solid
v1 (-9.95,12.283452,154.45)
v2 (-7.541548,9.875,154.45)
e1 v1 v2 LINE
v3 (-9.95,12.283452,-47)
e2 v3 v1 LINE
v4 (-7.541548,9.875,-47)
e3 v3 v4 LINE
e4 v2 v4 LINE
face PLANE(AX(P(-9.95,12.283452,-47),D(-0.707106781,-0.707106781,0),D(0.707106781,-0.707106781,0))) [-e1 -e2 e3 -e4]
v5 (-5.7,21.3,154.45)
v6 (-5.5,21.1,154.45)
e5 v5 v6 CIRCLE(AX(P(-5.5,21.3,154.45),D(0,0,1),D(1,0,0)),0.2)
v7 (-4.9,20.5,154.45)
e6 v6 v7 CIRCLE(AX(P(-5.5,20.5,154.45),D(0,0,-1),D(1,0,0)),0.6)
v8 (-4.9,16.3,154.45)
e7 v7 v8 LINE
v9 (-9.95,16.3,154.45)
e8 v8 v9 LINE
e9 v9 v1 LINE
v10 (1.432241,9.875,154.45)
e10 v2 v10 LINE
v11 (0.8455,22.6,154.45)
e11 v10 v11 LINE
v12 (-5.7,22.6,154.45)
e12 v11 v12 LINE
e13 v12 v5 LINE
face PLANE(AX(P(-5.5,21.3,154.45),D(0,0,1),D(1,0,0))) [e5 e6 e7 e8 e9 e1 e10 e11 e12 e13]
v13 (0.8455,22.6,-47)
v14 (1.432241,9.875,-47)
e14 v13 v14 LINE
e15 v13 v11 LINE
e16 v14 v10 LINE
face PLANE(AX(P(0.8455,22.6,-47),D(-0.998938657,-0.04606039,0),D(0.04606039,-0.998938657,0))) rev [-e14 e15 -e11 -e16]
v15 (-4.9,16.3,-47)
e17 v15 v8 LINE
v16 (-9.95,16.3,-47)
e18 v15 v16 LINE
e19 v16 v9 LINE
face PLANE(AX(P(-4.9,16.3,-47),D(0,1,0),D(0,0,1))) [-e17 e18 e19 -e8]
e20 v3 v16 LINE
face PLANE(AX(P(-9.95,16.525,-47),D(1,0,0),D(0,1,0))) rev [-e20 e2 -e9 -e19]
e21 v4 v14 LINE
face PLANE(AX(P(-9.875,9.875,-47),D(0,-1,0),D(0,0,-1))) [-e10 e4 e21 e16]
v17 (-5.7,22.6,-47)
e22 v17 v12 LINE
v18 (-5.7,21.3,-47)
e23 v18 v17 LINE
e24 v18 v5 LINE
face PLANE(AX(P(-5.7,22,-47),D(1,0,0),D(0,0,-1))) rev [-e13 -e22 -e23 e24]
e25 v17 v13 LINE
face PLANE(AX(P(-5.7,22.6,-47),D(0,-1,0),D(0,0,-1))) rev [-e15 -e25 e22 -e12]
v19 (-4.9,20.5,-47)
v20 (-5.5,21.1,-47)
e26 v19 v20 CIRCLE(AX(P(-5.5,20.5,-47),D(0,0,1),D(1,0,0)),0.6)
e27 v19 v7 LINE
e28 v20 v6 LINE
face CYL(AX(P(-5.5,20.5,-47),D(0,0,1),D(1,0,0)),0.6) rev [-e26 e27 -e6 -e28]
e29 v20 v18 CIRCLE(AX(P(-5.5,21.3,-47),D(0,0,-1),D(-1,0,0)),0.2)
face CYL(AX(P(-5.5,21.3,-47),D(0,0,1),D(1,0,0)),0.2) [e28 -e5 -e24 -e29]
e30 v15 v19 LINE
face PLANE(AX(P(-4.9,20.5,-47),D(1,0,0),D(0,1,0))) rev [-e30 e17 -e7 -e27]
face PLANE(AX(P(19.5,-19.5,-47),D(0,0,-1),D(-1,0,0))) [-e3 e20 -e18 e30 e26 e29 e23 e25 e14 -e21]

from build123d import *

# Parameters (mm, degrees)
Y_RAIL_SLOT_DEPTH      = 45
Y_RAIL_CONT_DEPTH      = 2
Z_RAIL_SLOT_DEPTH      = 45
X_RAIL_SLOT_DEPTH      = 45
TOLERANCE_START        = -45
TOLERANCE_CUT_Z_DEPTH  = 45
TOLERANCE_CUT_Y_DEPTH  = 135.627263211
TOLERANCE_CUT_X_DEPTH  = 45
SHARP_CORNER_FILLETS_R = 0.2
CUT_EXTRUDE1_DEPTH     = 135.627263211
CUT_EXTRUDE2_START     = -45
CUT_EXTRUDE2_DEPTH     = 45
SKETCH25_W             = 5.05
SKETCH25_H             = 4.200000003
SKETCH25_W_2           = 5.050000001
SKETCH25_H_2           = 4.200000002
SKETCH25_W_3           = 19.75
SKETCH25_H_3           = 19.75
CUT_EXTRUDE3_DEPTH     = 118.874933721
FILLET1_R              = 0.4
CUT_EXTRUDE4_DEPTH     = 118.874933721
BOSS_EXTRUDE1_START    = 109.45
BOSS_EXTRUDE1_DEPTH    = 109.45


with BuildPart() as part:
    # Sketch10 → Y-Rail Slot (new, symmetric)
    with BuildSketch(Plane.XY):
        with BuildLine():
            ThreePointArc((22, -5.8), (22.353553391, -5.946446609), (22.5, -6.3))
            Line((22.5, -6.3), (22.5, -19.5))
            ThreePointArc((22.5, -19.5), (21.621320343, -21.621320344), (19.499999999, -22.500000001))
            Line((19.499999999, -22.500000001), (24.499999999, -22.500000001))
            Line((24.499999999, -22.500000001), (24.499999999, 24.499999999))
            Line((24.499999999, 24.499999999), (-22.500000001, 24.499999999))
            Line((-22.500000001, 24.499999999), (-22.500000001, 19.500000001))
            ThreePointArc((-22.500000001, 19.500000001), (-21.621320345, 21.621320345), (-19.500000001, 22.500000001))
            Line((-19.500000001, 22.500000001), (-6.300000002, 22.500000001))
            ThreePointArc((-6.300000002, 22.500000001), (-5.946446612, 22.353553392), (-5.800000002, 22.000000001))
            Line((-5.800000002, 22.000000001), (-5.800000002, 21.000000004))
            Line((-5.800000002, 21.000000004), (-5.499999997, 21.000000004))
            ThreePointArc((-5.499999997, 21.000000004), (-5.146446607, 20.853553394), (-4.999999997, 20.500000004))
            Line((-4.999999997, 20.500000004), (-4.999999997, 17.525000004))
            ThreePointArc((-4.999999997, 17.525000004), (-5.146446607, 17.171446613), (-5.499999997, 17.025000004))
            Line((-5.499999997, 17.025000004), (-9.549999997, 17.025000004))
            ThreePointArc((-9.549999997, 17.025000004), (-9.903553388, 16.878553395), (-10.049999997, 16.525000004))
            Line((-10.049999997, 16.525000004), (-10.049999997, 11.757106781))
            ThreePointArc((-10.049999997, 11.757106781), (-10.011939764, 11.565765065), (-9.903553388, 11.403553391))
            Line((-9.903553388, 11.403553391), (-6.499999999, 8.000000002))
            Line((-6.499999998, 8.000000003), (2e-09, 8.000000003))
            Line((2e-09, 8.000000003), (6.500000002, 8.000000003))
            Line((6.500000002, 8.000000003), (9.903553392, 11.403553393))
            ThreePointArc((9.903553392, 11.403553393), (10.011939767, 11.565765067), (10.050000001, 11.757106783))
            Line((10.050000001, 11.757106783), (10.050000001, 16.525000003))
            ThreePointArc((10.050000001, 16.525000003), (9.903553392, 16.878553394), (9.550000001, 17.025000003))
            Line((9.550000001, 17.025000003), (5.5, 17.025000003))
            ThreePointArc((5.5, 17.025000003), (5.146446609, 17.171446613), (5, 17.525000003))
            Line((5, 17.525000003), (5, 20.500000003))
            ThreePointArc((5, 20.500000003), (5.146446609, 20.853553393), (5.5, 21.000000003))
            Line((5.5, 21.000000003), (5.800000001, 21.000000003))
            Line((5.800000001, 21.000000003), (5.800000001, 22.000000001))
            ThreePointArc((5.800000001, 22.000000001), (5.94644661, 22.353553392), (6.300000001, 22.500000001))
            Line((6.300000001, 22.500000001), (19.500000001, 22.500000001))
            ThreePointArc((19.500000001, 22.500000001), (21.621320345, 21.621320345), (22.500000001, 19.500000001))
            Line((22.500000001, 19.500000001), (22.500000001, 6.300000002))
            ThreePointArc((22.500000001, 6.300000002), (22.353553392, 5.946446612), (22.000000001, 5.800000002))
            Line((22.000000001, 5.800000002), (21.000000002, 5.800000002))
            Line((21.000000002, 5.800000002), (21.000000002, 5.500000005))
            ThreePointArc((21.000000002, 5.500000005), (20.853553393, 5.146446614), (20.500000002, 5.000000005))
            Line((20.500000002, 5.000000005), (17.525000003, 5.000000005))
            ThreePointArc((17.525000003, 5.000000005), (17.171446612, 5.146446614), (17.025000003, 5.500000005))
            Line((17.025000003, 5.500000005), (17.025000003, 10.050000003))
            Line((17.025000003, 10.050000003), (11.757106782, 10.050000003))
            ThreePointArc((11.757106782, 10.050000003), (11.565765066, 10.011939769), (11.403553391, 9.903553394))
            Line((11.403553391, 9.903553394), (8.000000002, 6.500000004))
            Line((8.000000001, 6.500000005), (8.000000001, 3e-09))
            Line((8.000000001, 3e-09), (8.000000001, -6.499999999))
            Line((8.000000001, -6.499999999), (11.40355339, -9.903553388))
            ThreePointArc((11.40355339, -9.903553388), (11.565765064, -10.011939763), (11.75710678, -10.049999997))
            Line((11.75710678, -10.049999997), (16.525, -10.049999997))
            ThreePointArc((16.525, -10.049999997), (16.878553391, -9.903553388), (17.025000001, -9.549999997))
            Line((17.025000001, -9.549999997), (17.025000001, -5.499999996))
            ThreePointArc((17.025000001, -5.499999996), (17.17144661, -5.146446605), (17.525000001, -4.999999996))
            Line((17.525000001, -4.999999996), (20.5, -4.999999996))
            ThreePointArc((20.5, -4.999999996), (20.853553391, -5.146446605), (21, -5.499999996))
            Line((21, -5.499999996), (21, -5.8))
            Line((21, -5.8), (22, -5.8))
        make_face()
    extrude(amount=Y_RAIL_SLOT_DEPTH, both=True)

    # Sketch12 → Y-Rail cont. (add)
    with BuildSketch(Plane(origin=(0, 0, -45), x_dir=(-1, 0, 0), z_dir=(0, 0, -1))):
        with BuildLine():
            Line((-22.5, -19.5), (-22.5, -6.3))
            ThreePointArc((-22.5, -6.3), (-22.353553391, -5.946446609), (-22, -5.8))
            Line((-22, -5.8), (-21, -5.8))
            Line((-21, -5.8), (-21, -5.499999996))
            ThreePointArc((-21, -5.499999996), (-20.853553391, -5.146446605), (-20.5, -4.999999996))
            Line((-20.5, -4.999999996), (-17.525000001, -4.999999996))
            ThreePointArc((-17.525000001, -4.999999996), (-17.17144661, -5.146446605), (-17.025000001, -5.499999996))
            Line((-17.025000001, -5.499999996), (-17.025000001, -9.549999997))
            ThreePointArc((-17.025000001, -9.549999997), (-16.878553391, -9.903553388), (-16.525, -10.049999997))
            Line((-16.525, -10.049999997), (-11.75710678, -10.049999997))
            ThreePointArc((-11.75710678, -10.049999997), (-11.565765064, -10.011939763), (-11.40355339, -9.903553388))
            Line((-11.40355339, -9.903553388), (-8.000000001, -6.499999999))
            Line((-8.000000001, -6.499999999), (-8.000000001, 6.500000003))
            Line((-8.000000001, 6.500000003), (-11.403553391, 9.903553394))
            ThreePointArc((-11.403553391, 9.903553394), (-11.565765066, 10.011939769), (-11.757106782, 10.050000003))
            Line((-11.757106782, 10.050000003), (-17.025000003, 10.050000003))
            Line((-17.025000003, 10.050000003), (-17.025000003, 5.500000005))
            ThreePointArc((-17.025000003, 5.500000005), (-17.171446612, 5.146446614), (-17.525000003, 5.000000005))
            Line((-17.525000003, 5.000000005), (-20.500000002, 5.000000005))
            ThreePointArc((-20.500000002, 5.000000005), (-20.853553393, 5.146446614), (-21.000000002, 5.500000005))
            Line((-21.000000002, 5.500000005), (-21.000000002, 5.800000002))
            Line((-21.000000002, 5.800000002), (-22.000000001, 5.800000002))
            ThreePointArc((-22.000000001, 5.800000002), (-22.353553392, 5.946446612), (-22.500000001, 6.300000002))
            Line((-22.500000001, 6.300000002), (-22.500000001, 19.500000001))
            ThreePointArc((-22.500000001, 19.500000001), (-21.621320345, 21.621320345), (-19.500000001, 22.500000001))
            Line((-19.500000001, 22.500000001), (-6.300000001, 22.500000001))
            ThreePointArc((-6.300000001, 22.500000001), (-5.94644661, 22.353553392), (-5.800000001, 22.000000001))
            Line((-5.800000001, 22.000000001), (-5.800000001, 21.000000003))
            Line((-5.800000001, 21.000000003), (-5.5, 21.000000003))
            ThreePointArc((-5.5, 21.000000003), (-5.146446609, 20.853553393), (-5, 20.500000003))
            Line((-5, 20.500000003), (-5, 17.525000003))
            ThreePointArc((-5, 17.525000003), (-5.146446609, 17.171446613), (-5.5, 17.025000003))
            Line((-5.5, 17.025000003), (-9.550000001, 17.025000003))
            ThreePointArc((-9.550000001, 17.025000003), (-9.903553392, 16.878553394), (-10.050000001, 16.525000003))
            Line((-10.050000001, 16.525000003), (-10.050000001, 11.757106783))
            ThreePointArc((-10.050000001, 11.757106783), (-10.011939767, 11.565765067), (-9.903553392, 11.403553393))
            Line((-9.903553392, 11.403553393), (-6.500000002, 8.000000003))
            Line((-6.500000002, 8.000000003), (6.5, 8.000000003))
            Line((6.5, 8.000000003), (9.903553388, 11.403553391))
            ThreePointArc((9.903553388, 11.403553391), (10.011939764, 11.565765065), (10.049999997, 11.757106781))
            Line((10.049999997, 11.757106781), (10.049999997, 16.525000004))
            ThreePointArc((10.049999997, 16.525000004), (9.903553388, 16.878553395), (9.549999997, 17.025000004))
            Line((9.549999997, 17.025000004), (5.499999997, 17.025000004))
            ThreePointArc((5.499999997, 17.025000004), (5.146446607, 17.171446613), (4.999999997, 17.525000004))
            Line((4.999999997, 17.525000004), (4.999999997, 20.500000004))
            ThreePointArc((4.999999997, 20.500000004), (5.146446607, 20.853553394), (5.499999997, 21.000000004))
            Line((5.499999997, 21.000000004), (5.800000002, 21.000000004))
            Line((5.800000002, 21.000000004), (5.800000002, 22.000000001))
            ThreePointArc((5.800000002, 22.000000001), (5.946446612, 22.353553392), (6.300000002, 22.500000001))
            Line((6.300000002, 22.500000001), (19.500000001, 22.500000001))
            ThreePointArc((19.500000001, 22.500000001), (21.621320345, 21.621320345), (22.500000001, 19.500000001))
            Line((22.500000001, 19.500000001), (22.500000001, 24.499999999))
            Line((22.500000001, 24.499999999), (-24.499999999, 24.499999999))
            Line((-24.499999999, 24.499999999), (-24.499999999, -22.500000001))
            Line((-24.499999999, -22.500000001), (-19.499999999, -22.500000001))
            ThreePointArc((-19.499999999, -22.500000001), (-21.621320343, -21.621320344), (-22.5, -19.5))
        make_face()
    extrude(amount=Y_RAIL_CONT_DEPTH)

    # Sketch17 → Z-Rail Slot (add)
    with BuildSketch(Plane(origin=(0, 24.499999999, 0), x_dir=(1, 0, 0), z_dir=(0, 1, 0))):
        with BuildLine():
            Line((19.499999999, -45), (24.499999999, -45))
            Line((24.499999999, -45), (24.499999999, 2))
            Line((24.499999999, 2), (-22.500000001, 2))
            Line((-22.500000001, 2), (-22.500000001, -2.999999998))
            ThreePointArc((-22.500000001, -2.999999998), (-21.621320345, -0.878679654), (-19.500000001, 2e-09))
            Line((-19.500000001, 2e-09), (-6.300000002, 2e-09))
            ThreePointArc((-6.300000002, 2e-09), (-5.946446612, -0.146446607), (-5.800000002, -0.499999998))
            Line((-5.800000002, -0.499999998), (-5.800000002, -1.499999995))
            Line((-5.800000002, -1.499999995), (-5.499999997, -1.499999995))
            ThreePointArc((-5.499999997, -1.499999995), (-5.146446607, -1.646446605), (-4.999999997, -1.999999995))
            Line((-4.999999997, -1.999999995), (-4.999999997, -4.974999995))
            ThreePointArc((-4.999999997, -4.974999995), (-5.146446607, -5.328553385), (-5.499999997, -5.474999995))
            Line((-5.499999997, -5.474999995), (-9.549999997, -5.474999995))
            ThreePointArc((-9.549999997, -5.474999995), (-9.903553388, -5.621446604), (-10.049999997, -5.974999995))
            Line((-10.049999997, -5.974999995), (-10.049999997, -10.742893218))
            ThreePointArc((-10.049999997, -10.742893218), (-10.011939764, -10.934234934), (-9.903553388, -11.096446608))
            Line((-9.903553388, -11.096446608), (-6.5, -14.499999996))
            Line((-6.5, -14.499999996), (6.500000002, -14.499999996))
            Line((6.500000002, -14.499999996), (9.903553392, -11.096446606))
            ThreePointArc((9.903553392, -11.096446606), (10.011939767, -10.934234932), (10.050000001, -10.742893216))
            Line((10.050000001, -10.742893216), (10.050000001, -5.974999996))
            ThreePointArc((10.050000001, -5.974999996), (9.903553392, -5.621446605), (9.550000001, -5.474999996))
            Line((9.550000001, -5.474999996), (5.5, -5.474999996))
            ThreePointArc((5.5, -5.474999996), (5.146446609, -5.328553386), (5, -4.974999996))
            Line((5, -4.974999996), (5, -1.999999996))
            ThreePointArc((5, -1.999999996), (5.146446609, -1.646446606), (5.5, -1.499999996))
            Line((5.5, -1.499999996), (5.800000001, -1.499999996))
            Line((5.800000001, -1.499999996), (5.800000001, -0.499999998))
            ThreePointArc((5.800000001, -0.499999998), (5.94644661, -0.146446607), (6.300000001, 2e-09))
            Line((6.300000001, 2e-09), (19.500000001, 2e-09))
            ThreePointArc((19.500000001, 2e-09), (21.621320345, -0.878679654), (22.500000001, -2.999999998))
            Line((22.500000001, -2.999999998), (22.500000001, -16.199999997))
            ThreePointArc((22.500000001, -16.199999997), (22.353553392, -16.553553387), (22.000000001, -16.699999997))
            Line((22.000000001, -16.699999997), (21.000000002, -16.699999997))
            Line((21.000000002, -16.699999997), (21.000000002, -16.999999994))
            ThreePointArc((21.000000002, -16.999999994), (20.853553393, -17.353553385), (20.500000002, -17.499999994))
            Line((20.500000002, -17.499999994), (17.525000003, -17.499999994))
            ThreePointArc((17.525000003, -17.499999994), (17.171446612, -17.353553385), (17.025000003, -16.999999994))
            Line((17.025000003, -16.999999994), (17.025000003, -12.449999996))
            Line((17.025000003, -12.449999996), (11.757106782, -12.449999996))
            ThreePointArc((11.757106782, -12.449999996), (11.565765066, -12.48806023), (11.403553391, -12.596446605))
            Line((11.403553391, -12.596446605), (8.000000001, -15.999999995))
            Line((8.000000001, -15.999999995), (8.000000001, -28.999999998))
            Line((8.000000001, -28.999999998), (11.40355339, -32.403553387))
            ThreePointArc((11.40355339, -32.403553387), (11.565765064, -32.511939762), (11.75710678, -32.549999996))
            Line((11.75710678, -32.549999996), (16.525, -32.549999996))
            ThreePointArc((16.525, -32.549999996), (16.878553391, -32.403553386), (17.025000001, -32.049999996))
            Line((17.025000001, -32.049999996), (17.025000001, -27.999999995))
            ThreePointArc((17.025000001, -27.999999995), (17.17144661, -27.646446604), (17.525000001, -27.499999995))
            Line((17.525000001, -27.499999995), (20.5, -27.499999995))
            ThreePointArc((20.5, -27.499999995), (20.853553391, -27.646446604), (21, -27.999999995))
            Line((21, -27.999999995), (21, -28.299999999))
            Line((21, -28.299999999), (22, -28.299999999))
            ThreePointArc((22, -28.299999999), (22.353553391, -28.446446608), (22.5, -28.799999999))
            Line((22.5, -28.799999999), (22.5, -41.999999999))
            ThreePointArc((22.5, -41.999999999), (21.621320343, -44.121320343), (19.499999999, -45))
        make_face()
    extrude(amount=Z_RAIL_SLOT_DEPTH)

    # Sketch11 → X-Rail Slot (add)
    with BuildSketch(Plane(origin=(24.499999999, 0, 0), x_dir=(0, 0, -1), z_dir=(1, 0, 0))):
        with BuildLine():
            ThreePointArc((16.2, 22.5), (16.553553391, 22.353553391), (16.7, 22))
            Line((16.7, 22), (16.7, 21))
            Line((16.7, 21), (17, 21))
            ThreePointArc((17, 21), (17.353553391, 20.853553391), (17.5, 20.5))
            Line((17.5, 20.5), (17.5, 17.525))
            ThreePointArc((17.5, 17.525), (17.353553391, 17.171446609), (17, 17.025))
            Line((17, 17.025), (12.95, 17.025))
            ThreePointArc((12.95, 17.025), (12.596446609, 16.878553391), (12.45, 16.525))
            Line((12.45, 16.525), (12.45, 11.757106781))
            ThreePointArc((12.45, 11.757106781), (12.488060234, 11.565765065), (12.596446609, 11.403553391))
            Line((12.596446609, 11.403553391), (16, 8))
            Line((16, 8), (22.5, 8))
            Line((22.5, 8), (29, 8))
            Line((29, 8), (32.403553391, 11.403553391))
            ThreePointArc((32.403553391, 11.403553391), (32.511939766, 11.565765065), (32.55, 11.757106781))
            Line((32.55, 11.757106781), (32.55, 17.025))
            Line((32.55, 17.025), (28, 17.025))
            ThreePointArc((28, 17.025), (27.646446609, 17.171446609), (27.5, 17.525))
            Line((27.5, 17.525), (27.5, 20.5))
            ThreePointArc((27.5, 20.5), (27.646446609, 20.853553391), (28, 21))
            Line((28, 21), (28.3, 21))
            Line((28.3, 21), (28.3, 22))
            ThreePointArc((28.3, 22), (28.446446609, 22.353553391), (28.8, 22.5))
            Line((28.8, 22.5), (42, 22.5))
            ThreePointArc((42, 22.5), (44.121320344, 21.621320344), (45, 19.5))
            Line((45, 19.5), (45, 6.3))
            ThreePointArc((45, 6.3), (44.853553391, 5.946446609), (44.5, 5.8))
            Line((44.5, 5.8), (43.5, 5.8))
            Line((43.5, 5.8), (43.5, 5.5))
            ThreePointArc((43.5, 5.5), (43.353553391, 5.146446609), (43, 5))
            Line((43, 5), (40.025, 5))
            ThreePointArc((40.025, 5), (39.671446609, 5.146446609), (39.525, 5.5))
            Line((39.525, 5.5), (39.525, 9.55))
            ThreePointArc((39.525, 9.55), (39.378553391, 9.903553391), (39.025, 10.05))
            Line((39.025, 10.05), (34.257106781, 10.05))
            ThreePointArc((34.257106781, 10.05), (34.065765065, 10.011939766), (33.903553391, 9.903553391))
            Line((33.903553391, 9.903553391), (30.5, 6.5))
            Line((30.5, 6.5), (30.5, 0))
            Line((30.5, 0), (30.5, -6.5))
            Line((30.5, -6.5), (33.903553391, -9.903553391))
            ThreePointArc((33.903553391, -9.903553391), (34.065765065, -10.011939766), (34.257106781, -10.05))
            Line((34.257106781, -10.05), (39.025, -10.05))
            ThreePointArc((39.025, -10.05), (39.378553391, -9.903553391), (39.525, -9.55))
            Line((39.525, -9.55), (39.525, -5.5))
            ThreePointArc((39.525, -5.5), (39.671446609, -5.146446609), (40.025, -5))
            Line((40.025, -5), (43, -5))
            ThreePointArc((43, -5), (43.353553391, -5.146446609), (43.5, -5.5))
            Line((43.5, -5.5), (43.5, -5.8))
            Line((43.5, -5.8), (44.5, -5.8))
            ThreePointArc((44.5, -5.8), (44.853553391, -5.946446609), (45, -6.3))
            Line((45, -6.3), (45, -19.5))
            ThreePointArc((45, -19.5), (44.121320344, -21.621320344), (42, -22.5))
            Line((42, -22.5), (47, -22.500000001))
            Line((47, -22.500000001), (47, 24.499999999))
            Line((47, 24.499999999), (-45, 24.499999999))
            Line((-45, 24.499999999), (-45, 19.5))
            ThreePointArc((-45, 19.5), (-44.121320344, 21.621320344), (-42, 22.5))
            Line((-42, 22.5), (-28.8, 22.5))
            ThreePointArc((-28.8, 22.5), (-28.446446609, 22.353553391), (-28.3, 22))
            Line((-28.3, 22), (-28.3, 21))
            Line((-28.3, 21), (-28, 21))
            ThreePointArc((-28, 21), (-27.646446609, 20.853553391), (-27.5, 20.5))
            Line((-27.5, 20.5), (-27.5, 17.525))
            ThreePointArc((-27.5, 17.525), (-27.646446609, 17.171446609), (-28, 17.025))
            Line((-28, 17.025), (-32.55, 17.025))
            Line((-32.55, 17.025), (-32.55, 11.757106781))
            ThreePointArc((-32.55, 11.757106781), (-32.511939766, 11.565765065), (-32.403553391, 11.403553391))
            Line((-32.403553391, 11.403553391), (-29, 8))
            Line((-29, 8), (-22.5, 8))
            Line((-22.5, 8), (-16, 8))
            Line((-16, 8), (-12.596446609, 11.403553391))
            ThreePointArc((-12.596446609, 11.403553391), (-12.488060234, 11.565765065), (-12.45, 11.757106781))
            Line((-12.45, 11.757106781), (-12.45, 16.525))
            ThreePointArc((-12.45, 16.525), (-12.596446609, 16.878553391), (-12.95, 17.025))
            Line((-12.95, 17.025), (-17, 17.025))
            ThreePointArc((-17, 17.025), (-17.353553391, 17.171446609), (-17.5, 17.525))
            Line((-17.5, 17.525), (-17.5, 20.5))
            ThreePointArc((-17.5, 20.5), (-17.353553391, 20.853553391), (-17, 21))
            Line((-17, 21), (-16.7, 21))
            Line((-16.7, 21), (-16.7, 22))
            ThreePointArc((-16.7, 22), (-16.553553391, 22.353553391), (-16.2, 22.5))
            Line((-16.2, 22.5), (-7.8, 22.5))
            Line((-7.8, 22.5), (-7.8, 21.5))
            ThreePointArc((-7.8, 21.5), (-7.653553391, 21.146446609), (-7.3, 21))
            Line((-7.3, 21), (7.3, 21))
            ThreePointArc((7.3, 21), (7.653553391, 21.146446609), (7.8, 21.5))
            Line((7.8, 21.5), (7.8, 22.5))
            Line((7.8, 22.5), (16.2, 22.5))
        make_face()
    extrude(amount=X_RAIL_SLOT_DEPTH)

    # Sketch20 → Tolerance Cut Z (cut)
    with BuildSketch(Plane(origin=(0, 69.499999999, 0), x_dir=(1, 0, 0), z_dir=(0, 1, 0)).offset(TOLERANCE_START)):
        with BuildLine():
            ThreePointArc((-22.500000001, -2.999999998), (-21.621320345, -0.878679654), (-19.500000001, 2e-09))
            Line((-19.500000001, 2e-09), (-6.300000002, 2e-09))
            ThreePointArc((-6.300000002, 2e-09), (-5.946446612, -0.146446607), (-5.800000002, -0.499999998))
            Line((-5.800000002, -0.499999998), (-5.800000002, -1.499999995))
            Line((-5.800000002, -1.499999995), (-5.499999997, -1.499999995))
            ThreePointArc((-5.499999997, -1.499999995), (-5.146446607, -1.646446605), (-4.999999997, -1.999999995))
            Line((-4.999999997, -1.999999995), (-4.999999997, -4.974999995))
            ThreePointArc((-4.999999997, -4.974999995), (-5.146446607, -5.328553385), (-5.499999997, -5.474999995))
            Line((-5.499999997, -5.474999995), (-9.549999997, -5.474999995))
            ThreePointArc((-9.549999997, -5.474999995), (-9.903553388, -5.621446604), (-10.049999997, -5.974999995))
            Line((-10.049999997, -5.974999995), (-10.049999997, -10.742893218))
            ThreePointArc((-10.049999997, -10.742893218), (-10.011939764, -10.934234934), (-9.903553388, -11.096446608))
            Line((-9.903553388, -11.096446608), (-6.5, -14.499999996))
            Line((-6.5, -14.499999996), (6.500000002, -14.499999996))
            Line((6.500000002, -14.499999996), (9.903553392, -11.096446606))
            ThreePointArc((9.903553392, -11.096446606), (10.011939767, -10.934234932), (10.050000001, -10.742893216))
            Line((10.050000001, -10.742893216), (10.050000001, -5.974999996))
            ThreePointArc((10.050000001, -5.974999996), (9.903553392, -5.621446605), (9.550000001, -5.474999996))
            Line((9.550000001, -5.474999996), (5.5, -5.474999996))
            ThreePointArc((5.5, -5.474999996), (5.146446609, -5.328553386), (5, -4.974999996))
            Line((5, -4.974999996), (5, -1.999999996))
            ThreePointArc((5, -1.999999996), (5.146446609, -1.646446606), (5.5, -1.499999996))
            Line((5.5, -1.499999996), (5.800000001, -1.499999996))
            Line((5.800000001, -1.499999996), (5.800000001, -0.499999998))
            ThreePointArc((5.800000001, -0.499999998), (5.94644661, -0.146446607), (6.300000001, 2e-09))
            Line((6.300000001, 2e-09), (19.500000001, 2e-09))
            ThreePointArc((19.500000001, 2e-09), (21.621320345, -0.878679654), (22.500000001, -2.999999998))
            Line((22.500000001, -2.999999998), (22.500000001, -16.199999997))
            ThreePointArc((22.500000001, -16.199999997), (22.353553392, -16.553553387), (22.000000001, -16.699999997))
            Line((22.000000001, -16.699999997), (21.000000002, -16.699999997))
            Line((21.000000002, -16.699999997), (21.000000002, -16.999999994))
            ThreePointArc((21.000000002, -16.999999994), (20.853553393, -17.353553385), (20.500000002, -17.499999994))
            Line((20.500000002, -17.499999994), (17.525000003, -17.499999994))
            ThreePointArc((17.525000003, -17.499999994), (17.171446612, -17.353553385), (17.025000003, -16.999999994))
            Line((17.025000003, -16.999999994), (17.025000003, -12.449999996))
            Line((17.025000003, -12.449999996), (11.757106782, -12.449999996))
            ThreePointArc((11.757106782, -12.449999996), (11.565765066, -12.48806023), (11.403553391, -12.596446605))
            Line((11.403553391, -12.596446605), (8.000000001, -15.999999995))
            Line((8.000000001, -15.999999995), (8.000000001, -28.999999998))
            Line((8.000000001, -28.999999998), (11.40355339, -32.403553387))
            ThreePointArc((11.40355339, -32.403553387), (11.565765064, -32.511939762), (11.75710678, -32.549999996))
            Line((11.75710678, -32.549999996), (16.525, -32.549999996))
            ThreePointArc((16.525, -32.549999996), (16.878553391, -32.403553386), (17.025000001, -32.049999996))
            Line((17.025000001, -32.049999996), (17.025000001, -27.999999995))
            ThreePointArc((17.025000001, -27.999999995), (17.17144661, -27.646446604), (17.525000001, -27.499999995))
            Line((17.525000001, -27.499999995), (20.5, -27.499999995))
            ThreePointArc((20.5, -27.499999995), (20.853553391, -27.646446604), (21, -27.999999995))
            Line((21, -27.999999995), (21, -28.299999999))
            Line((21, -28.299999999), (22, -28.299999999))
            ThreePointArc((22, -28.299999999), (22.353553391, -28.446446608), (22.5, -28.799999999))
            Line((22.5, -28.799999999), (22.5, -41.999999999))
            ThreePointArc((22.5, -41.999999999), (21.621320343, -44.121320343), (19.499999999, -45))
            Line((19.499999999, -45), (19.499999999, -45.1))
            ThreePointArc((19.499999999, -45.1), (21.692031022, -44.192031021), (22.6, -41.999999999))
            Line((22.6, -41.999999999), (22.6, -28.799999999))
            ThreePointArc((22.6, -28.799999999), (22.424264069, -28.37573593), (22, -28.199999999))
            Line((22, -28.199999999), (21.1, -28.199999999))
            Line((21.1, -28.199999999), (21.1, -27.999999995))
            ThreePointArc((21.1, -27.999999995), (20.924264069, -27.575735926), (20.5, -27.399999995))
            Line((20.5, -27.399999995), (17.525000001, -27.399999995))
            ThreePointArc((17.525000001, -27.399999995), (17.100735932, -27.575735926), (16.925000001, -27.999999995))
            Line((16.925000001, -27.999999995), (16.925000001, -32.049999996))
            ThreePointArc((16.925000001, -32.049999996), (16.807842713, -32.332842708), (16.525, -32.449999996))
            Line((16.525, -32.449999996), (11.75710678, -32.449999996))
            ThreePointArc((11.75710678, -32.449999996), (11.604033408, -32.419551809), (11.474264068, -32.332842709))
            Line((11.474264068, -32.332842709), (8.100000001, -28.958578641))
            Line((8.100000001, -28.958578641), (8.100000001, -16.041421352))
            Line((8.100000001, -16.041421352), (11.474264069, -12.667157283))
            ThreePointArc((11.474264069, -12.667157283), (11.604033409, -12.580448183), (11.757106782, -12.549999996))
            Line((11.757106782, -12.549999996), (16.925000003, -12.549999996))
            Line((16.925000003, -12.549999996), (16.925000003, -16.999999994))
            ThreePointArc((16.925000003, -16.999999994), (17.100735934, -17.424264063), (17.525000003, -17.599999994))
            Line((17.525000003, -17.599999994), (20.500000002, -17.599999994))
            ThreePointArc((20.500000002, -17.599999994), (20.924264071, -17.424264063), (21.100000002, -16.999999994))
            Line((21.100000002, -16.999999994), (21.100000002, -16.799999997))
            Line((21.100000002, -16.799999997), (22.000000001, -16.799999997))
            ThreePointArc((22.000000001, -16.799999997), (22.42426407, -16.624264066), (22.600000001, -16.199999997))
            Line((22.600000001, -16.199999997), (22.600000001, -2.999999998))
            ThreePointArc((22.600000001, -2.999999998), (21.692031023, -0.807968976), (19.500000001, 0.100000002))
            Line((19.500000001, 0.100000002), (6.300000001, 0.100000002))
            ThreePointArc((6.300000001, 0.100000002), (5.875735932, -0.075735929), (5.700000001, -0.499999998))
            Line((5.700000001, -0.499999998), (5.700000001, -1.399999996))
            Line((5.700000001, -1.399999996), (5.5, -1.399999996))
            ThreePointArc((5.5, -1.399999996), (5.075735931, -1.575735927), (4.9, -1.999999996))
            Line((4.9, -1.999999996), (4.9, -4.974999996))
            ThreePointArc((4.9, -4.974999996), (5.075735931, -5.399264064), (5.5, -5.574999996))
            Line((5.5, -5.574999996), (9.550000001, -5.574999996))
            ThreePointArc((9.550000001, -5.574999996), (9.832842713, -5.692157283), (9.950000001, -5.974999996))
            Line((9.950000001, -5.974999996), (9.950000001, -10.742893216))
            ThreePointArc((9.950000001, -10.742893216), (9.919551814, -10.895966589), (9.832842714, -11.025735928))
            Line((9.832842714, -11.025735928), (6.458578646, -14.399999996))
            Line((6.458578646, -14.399999996), (-6.458578644, -14.399999996))
            Line((-6.458578644, -14.399999996), (-9.83284271, -11.02573593))
            ThreePointArc((-9.83284271, -11.02573593), (-9.91955181, -10.89596659), (-9.949999997, -10.742893218))
            Line((-9.949999997, -10.742893218), (-9.949999997, -5.974999995))
            ThreePointArc((-9.949999997, -5.974999995), (-9.83284271, -5.692157282), (-9.549999997, -5.574999995))
            Line((-9.549999997, -5.574999995), (-5.499999997, -5.574999995))
            ThreePointArc((-5.499999997, -5.574999995), (-5.075735928, -5.399264064), (-4.899999997, -4.974999995))
            Line((-4.899999997, -4.974999995), (-4.899999997, -1.999999995))
            ThreePointArc((-4.899999997, -1.999999995), (-5.075735928, -1.575735927), (-5.499999997, -1.399999995))
            Line((-5.499999997, -1.399999995), (-5.700000002, -1.399999995))
            Line((-5.700000002, -1.399999995), (-5.700000002, -0.499999998))
            ThreePointArc((-5.700000002, -0.499999998), (-5.875735933, -0.075735929), (-6.300000002, 0.100000002))
            Line((-6.300000002, 0.100000002), (-19.500000001, 0.100000002))
            ThreePointArc((-19.500000001, 0.100000002), (-21.692031023, -0.807968976), (-22.600000001, -2.999999998))
            Line((-22.600000001, -2.999999998), (-22.500000001, -2.999999998))
        make_face()
    extrude(amount=TOLERANCE_CUT_Z_DEPTH, mode=Mode.SUBTRACT)

    # Sketch21 → Tolerance Cut Y (cut, through all)
    with BuildSketch(Plane.XY.offset(45)):
        with BuildLine():
            ThreePointArc((-22.500000001, 19.500000001), (-21.621320345, 21.621320345), (-19.500000001, 22.500000001))
            Line((-19.500000001, 22.500000001), (-6.300000002, 22.500000001))
            ThreePointArc((-6.300000002, 22.500000001), (-5.946446612, 22.353553392), (-5.800000002, 22.000000001))
            Line((-5.800000002, 22.000000001), (-5.800000002, 21.000000004))
            Line((-5.800000002, 21.000000004), (-5.499999997, 21.000000004))
            ThreePointArc((-5.499999997, 21.000000004), (-5.146446607, 20.853553394), (-4.999999997, 20.500000004))
            Line((-4.999999997, 20.500000004), (-4.999999997, 17.525000004))
            ThreePointArc((-4.999999997, 17.525000004), (-5.146446607, 17.171446613), (-5.499999997, 17.025000004))
            Line((-5.499999997, 17.025000004), (-9.549999997, 17.025000004))
            ThreePointArc((-9.549999997, 17.025000004), (-9.903553388, 16.878553395), (-10.049999997, 16.525000004))
            Line((-10.049999997, 16.525000004), (-10.049999997, 11.757106781))
            ThreePointArc((-10.049999997, 11.757106781), (-10.011939764, 11.565765065), (-9.903553388, 11.403553391))
            Line((-9.903553388, 11.403553391), (-6.5, 8.000000003))
            Line((-6.5, 8.000000003), (6.500000002, 8.000000003))
            Line((6.500000002, 8.000000003), (9.903553392, 11.403553393))
            ThreePointArc((9.903553392, 11.403553393), (10.011939767, 11.565765067), (10.050000001, 11.757106783))
            Line((10.050000001, 11.757106783), (10.050000001, 16.525000003))
            ThreePointArc((10.050000001, 16.525000003), (9.903553392, 16.878553394), (9.550000001, 17.025000003))
            Line((9.550000001, 17.025000003), (5.5, 17.025000003))
            ThreePointArc((5.5, 17.025000003), (5.146446609, 17.171446613), (5, 17.525000003))
            Line((5, 17.525000003), (5, 20.500000003))
            ThreePointArc((5, 20.500000003), (5.146446609, 20.853553393), (5.5, 21.000000003))
            Line((5.5, 21.000000003), (5.800000001, 21.000000003))
            Line((5.800000001, 21.000000003), (5.800000001, 22.000000001))
            ThreePointArc((5.800000001, 22.000000001), (5.94644661, 22.353553392), (6.300000001, 22.500000001))
            Line((6.300000001, 22.500000001), (19.500000001, 22.500000001))
            ThreePointArc((19.500000001, 22.500000001), (21.621320345, 21.621320345), (22.500000001, 19.500000001))
            Line((22.500000001, 19.500000001), (22.500000001, 6.300000002))
            ThreePointArc((22.500000001, 6.300000002), (22.353553392, 5.946446612), (22.000000001, 5.800000002))
            Line((22.000000001, 5.800000002), (21.000000002, 5.800000002))
            Line((21.000000002, 5.800000002), (21.000000002, 5.500000005))
            ThreePointArc((21.000000002, 5.500000005), (20.853553393, 5.146446614), (20.500000002, 5.000000005))
            Line((20.500000002, 5.000000005), (17.525000003, 5.000000005))
            ThreePointArc((17.525000003, 5.000000005), (17.171446612, 5.146446614), (17.025000003, 5.500000005))
            Line((17.025000003, 5.500000005), (17.025000003, 10.050000003))
            Line((17.025000003, 10.050000003), (11.757106782, 10.050000003))
            ThreePointArc((11.757106782, 10.050000003), (11.565765066, 10.011939769), (11.403553391, 9.903553394))
            Line((11.403553391, 9.903553394), (8.000000001, 6.500000003))
            Line((8.000000001, 6.500000003), (8.000000001, -6.499999999))
            Line((8.000000001, -6.499999999), (11.40355339, -9.903553388))
            ThreePointArc((11.40355339, -9.903553388), (11.565765064, -10.011939763), (11.75710678, -10.049999997))
            Line((11.75710678, -10.049999997), (16.525, -10.049999997))
            ThreePointArc((16.525, -10.049999997), (16.878553391, -9.903553388), (17.025000001, -9.549999997))
            Line((17.025000001, -9.549999997), (17.025000001, -5.499999996))
            ThreePointArc((17.025000001, -5.499999996), (17.17144661, -5.146446605), (17.525000001, -4.999999996))
            Line((17.525000001, -4.999999996), (20.5, -4.999999996))
            ThreePointArc((20.5, -4.999999996), (20.853553391, -5.146446605), (21, -5.499999996))
            Line((21, -5.499999996), (21, -5.8))
            Line((21, -5.8), (22, -5.8))
            ThreePointArc((22, -5.8), (22.353553391, -5.946446609), (22.5, -6.3))
            Line((22.5, -6.3), (22.5, -19.5))
            ThreePointArc((22.5, -19.5), (21.621320343, -21.621320344), (19.499999999, -22.500000001))
            Line((19.499999999, -22.500000001), (19.499999999, -22.600000001))
            ThreePointArc((19.499999999, -22.600000001), (21.692031022, -21.692031022), (22.6, -19.5))
            Line((22.6, -19.5), (22.6, -6.3))
            ThreePointArc((22.6, -6.3), (22.424264069, -5.875735931), (22, -5.7))
            Line((22, -5.7), (21.1, -5.7))
            Line((21.1, -5.7), (21.1, -5.499999996))
            ThreePointArc((21.1, -5.499999996), (20.924264069, -5.075735927), (20.5, -4.899999996))
            Line((20.5, -4.899999996), (17.525000001, -4.899999996))
            ThreePointArc((17.525000001, -4.899999996), (17.100735932, -5.075735927), (16.925000001, -5.499999996))
            Line((16.925000001, -5.499999996), (16.925000001, -9.549999997))
            ThreePointArc((16.925000001, -9.549999997), (16.807842713, -9.832842709), (16.525, -9.949999997))
            Line((16.525, -9.949999997), (11.75710678, -9.949999997))
            ThreePointArc((11.75710678, -9.949999997), (11.604033408, -9.91955181), (11.474264068, -9.83284271))
            Line((11.474264068, -9.83284271), (8.100000001, -6.458578642))
            Line((8.100000001, -6.458578642), (8.100000001, 6.458578647))
            Line((8.100000001, 6.458578647), (11.474264069, 9.832842716))
            ThreePointArc((11.474264069, 9.832842716), (11.604033409, 9.919551816), (11.757106782, 9.950000003))
            Line((11.757106782, 9.950000003), (16.925000003, 9.950000003))
            Line((16.925000003, 9.950000003), (16.925000003, 5.500000005))
            ThreePointArc((16.925000003, 5.500000005), (17.100735934, 5.075735936), (17.525000003, 4.900000005))
            Line((17.525000003, 4.900000005), (20.500000002, 4.900000005))
            ThreePointArc((20.500000002, 4.900000005), (20.924264071, 5.075735936), (21.100000002, 5.500000005))
            Line((21.100000002, 5.500000005), (21.100000002, 5.700000002))
            Line((21.100000002, 5.700000002), (22.000000001, 5.700000002))
            ThreePointArc((22.000000001, 5.700000002), (22.42426407, 5.875735933), (22.600000001, 6.300000002))
            Line((22.600000001, 6.300000002), (22.600000001, 19.500000001))
            ThreePointArc((22.600000001, 19.500000001), (21.692031023, 21.692031023), (19.500000001, 22.600000001))
            Line((19.500000001, 22.600000001), (6.300000001, 22.600000001))
            ThreePointArc((6.300000001, 22.600000001), (5.875735932, 22.42426407), (5.700000001, 22.000000001))
            Line((5.700000001, 22.000000001), (5.700000001, 21.100000003))
            Line((5.700000001, 21.100000003), (5.5, 21.100000003))
            ThreePointArc((5.5, 21.100000003), (5.075735931, 20.924264072), (4.9, 20.500000003))
            Line((4.9, 20.500000003), (4.9, 17.525000003))
            ThreePointArc((4.9, 17.525000003), (5.075735931, 17.100735935), (5.5, 16.925000003))
            Line((5.5, 16.925000003), (9.550000001, 16.925000003))
            ThreePointArc((9.550000001, 16.925000003), (9.832842713, 16.807842716), (9.950000001, 16.525000003))
            Line((9.950000001, 16.525000003), (9.950000001, 11.757106783))
            ThreePointArc((9.950000001, 11.757106783), (9.919551814, 11.60403341), (9.832842714, 11.474264071))
            Line((9.832842714, 11.474264071), (6.458578646, 8.100000003))
            Line((6.458578646, 8.100000003), (-6.458578644, 8.100000003))
            Line((-6.458578644, 8.100000003), (-9.83284271, 11.474264069))
            ThreePointArc((-9.83284271, 11.474264069), (-9.91955181, 11.604033408), (-9.949999997, 11.757106781))
            Line((-9.949999997, 11.757106781), (-9.949999997, 16.525000004))
            ThreePointArc((-9.949999997, 16.525000004), (-9.83284271, 16.807842717), (-9.549999997, 16.925000004))
            Line((-9.549999997, 16.925000004), (-5.499999997, 16.925000004))
            ThreePointArc((-5.499999997, 16.925000004), (-5.075735928, 17.100735935), (-4.899999997, 17.525000004))
            Line((-4.899999997, 17.525000004), (-4.899999997, 20.500000004))
            ThreePointArc((-4.899999997, 20.500000004), (-5.075735928, 20.924264072), (-5.499999997, 21.100000004))
            Line((-5.499999997, 21.100000004), (-5.700000002, 21.100000004))
            Line((-5.700000002, 21.100000004), (-5.700000002, 22.000000001))
            ThreePointArc((-5.700000002, 22.000000001), (-5.875735933, 22.42426407), (-6.300000002, 22.600000001))
            Line((-6.300000002, 22.600000001), (-19.500000001, 22.600000001))
            ThreePointArc((-19.500000001, 22.600000001), (-21.692031023, 21.692031023), (-22.600000001, 19.500000001))
            Line((-22.600000001, 19.500000001), (-22.500000001, 19.500000001))
        make_face()
    extrude(amount=-TOLERANCE_CUT_Y_DEPTH, mode=Mode.SUBTRACT)

    # Sketch22 → Tolerance Cut X (cut)
    with BuildSketch(Plane(origin=(69.499999999, 0, 0), x_dir=(0, 0, -1), z_dir=(1, 0, 0)).offset(TOLERANCE_START)):
        with BuildLine():
            ThreePointArc((-45, 19.5), (-44.121320344, 21.621320344), (-42, 22.5))
            Line((-42, 22.5), (-28.8, 22.5))
            ThreePointArc((-28.8, 22.5), (-28.446446609, 22.353553391), (-28.3, 22))
            Line((-28.3, 22), (-28.3, 21))
            Line((-28.3, 21), (-28, 21))
            ThreePointArc((-28, 21), (-27.646446609, 20.853553391), (-27.5, 20.5))
            Line((-27.5, 20.5), (-27.5, 17.525))
            ThreePointArc((-27.5, 17.525), (-27.646446609, 17.171446609), (-28, 17.025))
            Line((-28, 17.025), (-32.55, 17.025))
            Line((-32.55, 17.025), (-32.55, 11.757106781))
            ThreePointArc((-32.55, 11.757106781), (-32.511939766, 11.565765065), (-32.403553391, 11.403553391))
            Line((-32.403553391, 11.403553391), (-29, 8))
            Line((-29, 8), (-16, 8))
            Line((-16, 8), (-12.596446609, 11.403553391))
            ThreePointArc((-12.596446609, 11.403553391), (-12.488060234, 11.565765065), (-12.45, 11.757106781))
            Line((-12.45, 11.757106781), (-12.45, 16.525))
            ThreePointArc((-12.45, 16.525), (-12.596446609, 16.878553391), (-12.95, 17.025))
            Line((-12.95, 17.025), (-17, 17.025))
            ThreePointArc((-17, 17.025), (-17.353553391, 17.171446609), (-17.5, 17.525))
            Line((-17.5, 17.525), (-17.5, 20.5))
            ThreePointArc((-17.5, 20.5), (-17.353553391, 20.853553391), (-17, 21))
            Line((-17, 21), (-16.7, 21))
            Line((-16.7, 21), (-16.7, 22))
            ThreePointArc((-16.7, 22), (-16.553553391, 22.353553391), (-16.2, 22.5))
            Line((-16.2, 22.5), (-7.8, 22.5))
            Line((-7.8, 22.5), (-7.8, 21.5))
            ThreePointArc((-7.8, 21.5), (-7.653553391, 21.146446609), (-7.3, 21))
            Line((-7.3, 21), (7.3, 21))
            ThreePointArc((7.3, 21), (7.653553391, 21.146446609), (7.8, 21.5))
            Line((7.8, 21.5), (7.8, 22.5))
            Line((7.8, 22.5), (16.2, 22.5))
            ThreePointArc((16.2, 22.5), (16.553553391, 22.353553391), (16.7, 22))
            Line((16.7, 22), (16.7, 21))
            Line((16.7, 21), (17, 21))
            ThreePointArc((17, 21), (17.353553391, 20.853553391), (17.5, 20.5))
            Line((17.5, 20.5), (17.5, 17.525))
            ThreePointArc((17.5, 17.525), (17.353553391, 17.171446609), (17, 17.025))
            Line((17, 17.025), (12.95, 17.025))
            ThreePointArc((12.95, 17.025), (12.596446609, 16.878553391), (12.45, 16.525))
            Line((12.45, 16.525), (12.45, 11.757106781))
            ThreePointArc((12.45, 11.757106781), (12.488060234, 11.565765065), (12.596446609, 11.403553391))
            Line((12.596446609, 11.403553391), (16, 8))
            Line((16, 8), (29, 8))
            Line((29, 8), (32.403553391, 11.403553391))
            ThreePointArc((32.403553391, 11.403553391), (32.511939766, 11.565765065), (32.55, 11.757106781))
            Line((32.55, 11.757106781), (32.55, 17.025))
            Line((32.55, 17.025), (28, 17.025))
            ThreePointArc((28, 17.025), (27.646446609, 17.171446609), (27.5, 17.525))
            Line((27.5, 17.525), (27.5, 20.5))
            ThreePointArc((27.5, 20.5), (27.646446609, 20.853553391), (28, 21))
            Line((28, 21), (28.3, 21))
            Line((28.3, 21), (28.3, 22))
            ThreePointArc((28.3, 22), (28.446446609, 22.353553391), (28.8, 22.5))
            Line((28.8, 22.5), (42, 22.5))
            ThreePointArc((42, 22.5), (44.121320344, 21.621320344), (45, 19.5))
            Line((45, 19.5), (45, 6.3))
            ThreePointArc((45, 6.3), (44.853553391, 5.946446609), (44.5, 5.8))
            Line((44.5, 5.8), (43.5, 5.8))
            Line((43.5, 5.8), (43.5, 5.5))
            ThreePointArc((43.5, 5.5), (43.353553391, 5.146446609), (43, 5))
            Line((43, 5), (40.025, 5))
            ThreePointArc((40.025, 5), (39.671446609, 5.146446609), (39.525, 5.5))
            Line((39.525, 5.5), (39.525, 9.55))
            ThreePointArc((39.525, 9.55), (39.378553391, 9.903553391), (39.025, 10.05))
            Line((39.025, 10.05), (34.257106781, 10.05))
            ThreePointArc((34.257106781, 10.05), (34.065765065, 10.011939766), (33.903553391, 9.903553391))
            Line((33.903553391, 9.903553391), (30.5, 6.5))
            Line((30.5, 6.5), (30.5, -6.5))
            Line((30.5, -6.5), (33.903553391, -9.903553391))
            ThreePointArc((33.903553391, -9.903553391), (34.065765065, -10.011939766), (34.257106781, -10.05))
            Line((34.257106781, -10.05), (39.025, -10.05))
            ThreePointArc((39.025, -10.05), (39.378553391, -9.903553391), (39.525, -9.55))
            Line((39.525, -9.55), (39.525, -5.5))
            ThreePointArc((39.525, -5.5), (39.671446609, -5.146446609), (40.025, -5))
            Line((40.025, -5), (43, -5))
            ThreePointArc((43, -5), (43.353553391, -5.146446609), (43.5, -5.5))
            Line((43.5, -5.5), (43.5, -5.8))
            Line((43.5, -5.8), (44.5, -5.8))
            ThreePointArc((44.5, -5.8), (44.853553391, -5.946446609), (45, -6.3))
            Line((45, -6.3), (45.000000001, -19.5))
            ThreePointArc((45.000000001, -19.5), (44.121320344, -21.621320344), (42, -22.500000001))
            Line((42, -22.500000001), (42, -22.600000001))
            ThreePointArc((42, -22.600000001), (44.192031022, -21.692031022), (45.100000001, -19.5))
            Line((45.100000001, -19.5), (45.1, -6.3))
            ThreePointArc((45.1, -6.3), (44.924264069, -5.875735931), (44.5, -5.7))
            Line((44.5, -5.7), (43.6, -5.7))
            Line((43.6, -5.7), (43.6, -5.5))
            ThreePointArc((43.6, -5.5), (43.424264069, -5.075735931), (43, -4.9))
            Line((43, -4.9), (40.025, -4.9))
            ThreePointArc((40.025, -4.9), (39.600735931, -5.075735931), (39.425, -5.5))
            Line((39.425, -5.5), (39.425, -9.55))
            ThreePointArc((39.425, -9.55), (39.307842712, -9.832842712), (39.025, -9.95))
            Line((39.025, -9.95), (34.257106781, -9.95))
            ThreePointArc((34.257106781, -9.95), (34.104033408, -9.919551813), (33.974264069, -9.832842712))
            Line((33.974264069, -9.832842712), (30.6, -6.458578644))
            Line((30.6, -6.458578644), (30.6, 6.458578644))
            Line((30.6, 6.458578644), (33.974264069, 9.832842713))
            ThreePointArc((33.974264069, 9.832842713), (34.104033408, 9.919551813), (34.257106781, 9.95))
            Line((34.257106781, 9.95), (39.025, 9.95))
            ThreePointArc((39.025, 9.95), (39.307842712, 9.832842713), (39.425, 9.55))
            Line((39.425, 9.55), (39.425, 5.5))
            ThreePointArc((39.425, 5.5), (39.600735931, 5.075735931), (40.025, 4.9))
            Line((40.025, 4.9), (43, 4.9))
            ThreePointArc((43, 4.9), (43.424264069, 5.075735931), (43.6, 5.5))
            Line((43.6, 5.5), (43.6, 5.7))
            Line((43.6, 5.7), (44.5, 5.7))
            ThreePointArc((44.5, 5.7), (44.924264069, 5.875735931), (45.1, 6.3))
            Line((45.1, 6.3), (45.1, 19.5))
            ThreePointArc((45.1, 19.5), (44.192031022, 21.692031022), (42, 22.6))
            Line((42, 22.6), (28.8, 22.6))
            ThreePointArc((28.8, 22.6), (28.375735931, 22.424264069), (28.2, 22))
            Line((28.2, 22), (28.2, 21.1))
            Line((28.2, 21.1), (28, 21.1))
            ThreePointArc((28, 21.1), (27.575735931, 20.924264069), (27.4, 20.5))
            Line((27.4, 20.5), (27.4, 17.525))
            ThreePointArc((27.4, 17.525), (27.575735931, 17.100735931), (28, 16.925))
            Line((28, 16.925), (32.45, 16.925))
            Line((32.45, 16.925), (32.45, 11.757106781))
            ThreePointArc((32.45, 11.757106781), (32.419551813, 11.604033408), (32.332842712, 11.474264069))
            Line((32.332842712, 11.474264069), (28.958578644, 8.1))
            Line((28.958578644, 8.1), (16.041421356, 8.1))
            Line((16.041421356, 8.1), (12.667157288, 11.474264069))
            ThreePointArc((12.667157288, 11.474264069), (12.580448187, 11.604033408), (12.55, 11.757106781))
            Line((12.55, 11.757106781), (12.55, 16.525))
            ThreePointArc((12.55, 16.525), (12.667157288, 16.807842713), (12.95, 16.925))
            Line((12.95, 16.925), (17, 16.925))
            ThreePointArc((17, 16.925), (17.424264069, 17.100735931), (17.6, 17.525))
            Line((17.6, 17.525), (17.6, 20.5))
            ThreePointArc((17.6, 20.5), (17.424264069, 20.924264069), (17, 21.1))
            Line((17, 21.1), (16.8, 21.1))
            Line((16.8, 21.1), (16.8, 22))
            ThreePointArc((16.8, 22), (16.624264069, 22.424264069), (16.2, 22.6))
            Line((16.2, 22.6), (7.7, 22.6))
            Line((7.7, 22.6), (7.7, 21.5))
            ThreePointArc((7.7, 21.5), (7.582842712, 21.217157288), (7.3, 21.1))
            Line((7.3, 21.1), (-7.3, 21.1))
            ThreePointArc((-7.3, 21.1), (-7.582842712, 21.217157288), (-7.7, 21.5))
            Line((-7.7, 21.5), (-7.7, 22.6))
            Line((-7.7, 22.6), (-16.2, 22.6))
            ThreePointArc((-16.2, 22.6), (-16.624264069, 22.424264069), (-16.8, 22))
            Line((-16.8, 22), (-16.8, 21.1))
            Line((-16.8, 21.1), (-17, 21.1))
            ThreePointArc((-17, 21.1), (-17.424264069, 20.924264069), (-17.6, 20.5))
            Line((-17.6, 20.5), (-17.6, 17.525))
            ThreePointArc((-17.6, 17.525), (-17.424264069, 17.100735931), (-17, 16.925))
            Line((-17, 16.925), (-12.95, 16.925))
            ThreePointArc((-12.95, 16.925), (-12.667157288, 16.807842712), (-12.55, 16.525))
            Line((-12.55, 16.525), (-12.55, 11.757106781))
            ThreePointArc((-12.55, 11.757106781), (-12.580448187, 11.604033408), (-12.667157288, 11.474264069))
            Line((-12.667157288, 11.474264069), (-16.041421356, 8.1))
            Line((-16.041421356, 8.1), (-28.958578644, 8.1))
            Line((-28.958578644, 8.1), (-32.332842712, 11.474264069))
            ThreePointArc((-32.332842712, 11.474264069), (-32.419551813, 11.604033408), (-32.45, 11.757106781))
            Line((-32.45, 11.757106781), (-32.45, 16.925))
            Line((-32.45, 16.925), (-28, 16.925))
            ThreePointArc((-28, 16.925), (-27.575735931, 17.100735931), (-27.4, 17.525))
            Line((-27.4, 17.525), (-27.4, 20.5))
            ThreePointArc((-27.4, 20.5), (-27.575735931, 20.924264069), (-28, 21.1))
            Line((-28, 21.1), (-28.2, 21.1))
            Line((-28.2, 21.1), (-28.2, 22))
            ThreePointArc((-28.2, 22), (-28.375735931, 22.424264069), (-28.8, 22.6))
            Line((-28.8, 22.6), (-42, 22.6))
            ThreePointArc((-42, 22.6), (-44.192031022, 21.692031022), (-45.1, 19.5))
            Line((-45.1, 19.5), (-45, 19.5))
        make_face()
    extrude(amount=TOLERANCE_CUT_X_DEPTH, mode=Mode.SUBTRACT)

    # Sharp Corner Fillets
    # the kernel refuses this fillet: 0.2 mm, written as the material it takes off along each edge
    with BuildSketch(Plane(origin=(21.100000002, 24.499999999, 16.799999997), x_dir=(1, 0, 0), z_dir=(0, 1, 0)), Plane(origin=(21.1, 24.499999999, 28.199999999), x_dir=(0, 0, -1), z_dir=(0, 1, 0)), Plane(origin=(5.700000001, 24.499999999, 1.399999996), x_dir=(-1, 0, 0), z_dir=(0, 1, 0)), Plane(origin=(-5.700000002, 24.499999999, 1.399999995), x_dir=(0, 0, -1), z_dir=(0, 1, 0))) as sharp_corner_fillets_piece_1:
        with BuildLine():
            CenterArc((SHARP_CORNER_FILLETS_R, -SHARP_CORNER_FILLETS_R), SHARP_CORNER_FILLETS_R, 90, 90)
            Line((0, -SHARP_CORNER_FILLETS_R), (0, 0))
            Line((0, 0), (SHARP_CORNER_FILLETS_R, 0))
        make_face()
    extrude(amount=45.5, mode=Mode.SUBTRACT)
    with BuildSketch(Plane(origin=(-22.500000001, 71.913499879, 2.21897503), x_dir=(0, 0, -1), z_dir=(0, -1, 0)), Plane(origin=(71.913499879, 20.281024968, 45), x_dir=(0, 1, 0), z_dir=(-1, 0, 0))) as sharp_corner_fillets_piece_2:
        with BuildLine():
            CenterArc((0.965399952, 0.2), SHARP_CORNER_FILLETS_R, 121.9527464, 148.0472536)
            ThreePointArc((0.859556018, 0.36969697), (0.44380678, 0.152231191), (0, 0))
            Line((0, 0), (0.965399952, 0))
        make_face()
    extrude(amount=47.41349988, mode=Mode.SUBTRACT)
    with BuildSketch(Plane(origin=(20.281024967, 71.91349988, 45), x_dir=(1, 0, 0), z_dir=(0, -1, 0))) as sharp_corner_fillets_piece_3:
        with BuildLine():
            CenterArc((0.965399952, -0.2), SHARP_CORNER_FILLETS_R, 90, 148.047253605)
            ThreePointArc((0.859556018, -0.36969697), (0.44380678, -0.152231191), (0, 0))
            Line((0, 0), (0.965399952, 0))
        make_face()
    extrude(amount=47.413499881, mode=Mode.SUBTRACT)
    with BuildSketch(Plane(origin=(21.1, -5.7, 45.5), x_dir=(1, 0, 0), z_dir=(0, 0, -1)), Plane(origin=(21.100000002, 5.700000002, 45.5), x_dir=(0, -1, 0), z_dir=(0, 0, -1)), Plane(origin=(5.700000001, 21.100000003, 45.5), x_dir=(0, 1, 0), z_dir=(0, 0, -1)), Plane(origin=(-5.700000002, 21.100000004, 45.5), x_dir=(1, 0, 0), z_dir=(0, 0, -1))) as sharp_corner_fillets_piece_4:
        with BuildLine():
            CenterArc((SHARP_CORNER_FILLETS_R, -SHARP_CORNER_FILLETS_R), SHARP_CORNER_FILLETS_R, 90, 90)
            Line((0, -SHARP_CORNER_FILLETS_R), (0, 0))
            Line((0, 0), (SHARP_CORNER_FILLETS_R, 0))
        make_face()
    extrude(amount=93, mode=Mode.SUBTRACT)
    with BuildSketch(Plane(origin=(-22.500000001, 20.281024969, -49.41349988), x_dir=(0.3951070153532721, 0.9186350997096885, 0), z_dir=(0, 0, 1))) as sharp_corner_fillets_piece_5:
        with BuildLine():
            CenterArc((0.965871684, 0.197709274), SHARP_CORNER_FILLETS_R, 113.272648501, 148.0472536)
            Line((0.886850281, 0.381436294), (0, 0))
            ThreePointArc((0, 0), (0.467844097, 0.035506257), (0.935688194, 0))
        make_face()
    extrude(amount=96.82699976, mode=Mode.SUBTRACT)
    with BuildSketch(Plane(origin=(20.281024967, -22.500000001, -49.413499881), x_dir=(1, 0, 0), z_dir=(0, 0, 1))) as sharp_corner_fillets_piece_6:
        with BuildLine():
            CenterArc((0.965399952, 0.2), SHARP_CORNER_FILLETS_R, 121.952746395, 148.047253605)
            ThreePointArc((0.859556018, 0.36969697), (0.44380678, 0.152231191), (0, 0))
            Line((0, 0), (0.965399952, 0))
        make_face()
    extrude(amount=96.826999761, mode=Mode.SUBTRACT)
    with BuildSketch(Plane(origin=(71.913499873, -22.5, -42.781024971), x_dir=(0, -2.099979945321112e-10, -1.0), z_dir=(-1, 0, 0))) as sharp_corner_fillets_piece_7:
        with BuildLine():
            CenterArc((0.96539995, -0.2), SHARP_CORNER_FILLETS_R, 90, 148.047253566)
            ThreePointArc((0.859556015, -0.36969697), (0.443806779, -0.152231191), (0, 0))
            Line((0, 0), (0.96539995, 0))
        make_face()
    extrude(amount=47.413499874, mode=Mode.SUBTRACT)
    with BuildSketch(Plane(origin=(24.499999999, -5.7, -43.6), x_dir=(0, 0, -1), z_dir=(1, 0, 0)), Plane(origin=(24.499999999, 5.7, -43.6), x_dir=(0, -1, 0), z_dir=(1, 0, 0)), Plane(origin=(24.499999999, 21.1, -28.2), x_dir=(0, 1, 0), z_dir=(1, 0, 0)), Plane(origin=(24.499999999, 21.1, -16.8), x_dir=(0, 0, -1), z_dir=(1, 0, 0)), Plane(origin=(24.499999999, 21.1, 16.8), x_dir=(0, 1, 0), z_dir=(1, 0, 0)), Plane(origin=(24.499999999, 21.1, 28.2), x_dir=(0, 0, -1), z_dir=(1, 0, 0))) as sharp_corner_fillets_piece_8:
        with BuildLine():
            CenterArc((SHARP_CORNER_FILLETS_R, SHARP_CORNER_FILLETS_R), SHARP_CORNER_FILLETS_R, 180, 90)
            Line((0, SHARP_CORNER_FILLETS_R), (0, 0))
            Line((0, 0), (SHARP_CORNER_FILLETS_R, 0))
        make_face()
    extrude(amount=45.5, mode=Mode.SUBTRACT)

    # Sketch23 → Cut-Extrude1 (cut, through all)
    with BuildSketch(Plane.XY.offset(45)):
        Polygon((24.499999999, 24.499999999), (0, 0), (0, -22.500000001), (69.499999999, -22.500000001), (69.499999999, 24.499999999), align=None)
    extrude(amount=-CUT_EXTRUDE1_DEPTH, mode=Mode.SUBTRACT)

    # Sketch24 → Cut-Extrude2 (cut)
    with BuildSketch(Plane(origin=(0, 69.499999999, 0), x_dir=(1, 0, 0), z_dir=(0, 1, 0)).offset(CUT_EXTRUDE2_START)):
        with BuildLine():
            Line((-4.899999997, -6.199999998), (-4.899999997, -4.974999995))
            ThreePointArc((-4.899999997, -4.974999995), (-5.075735928, -5.399264064), (-5.499999997, -5.574999995))
            Line((-5.499999997, -5.574999995), (-9.549999997, -5.574999995))
            ThreePointArc((-9.549999997, -5.574999995), (-9.83284271, -5.692157282), (-9.949999997, -5.974999995))
            Line((-9.949999997, -5.974999995), (-9.949999997, -6.199999998))
            Line((-9.949999997, -6.199999998), (-4.899999997, -6.199999998))
        make_face()
        with BuildLine():
            Line((-9.949999997, -10.216547618), (-9.949999997, -10.742893218))
            ThreePointArc((-9.949999997, -10.742893218), (-9.91955181, -10.89596659), (-9.83284271, -11.02573593))
            Line((-9.83284271, -11.02573593), (-6.458578644, -14.399999996))
            Line((-6.458578644, -14.399999996), (6.458578646, -14.399999996))
            Line((6.458578646, -14.399999996), (9.832842714, -11.025735928))
            ThreePointArc((9.832842714, -11.025735928), (9.919551814, -10.895966589), (9.950000001, -10.742893216))
            Line((9.950000001, -10.742893216), (9.950000001, -10.216547618))
            Line((9.950000001, -10.216547618), (7.54154762, -12.624999999))
            Line((7.54154762, -12.624999999), (-7.54154762, -12.624999999))
            Line((-7.54154762, -12.624999999), (-9.950000001, -10.216547618))
        make_face()
        with BuildLine():
            Line((12.283452379, -12.549999996), (11.757106782, -12.549999996))
            ThreePointArc((11.757106782, -12.549999996), (11.604033409, -12.580448183), (11.474264069, -12.667157283))
            Line((11.474264069, -12.667157283), (8.100000001, -16.041421352))
            Line((8.100000001, -16.041421352), (8.100000001, -28.266547624))
            Line((8.100000001, -28.266547624), (8.100000001, -28.958578641))
            Line((8.100000001, -28.958578641), (11.474264068, -32.332842709))
            ThreePointArc((11.474264068, -32.332842709), (11.604033408, -32.419551809), (11.75710678, -32.449999996))
            Line((11.75710678, -32.449999996), (12.283452379, -32.449999996))
            Line((12.283452379, -32.450000002), (9.875, -30.041547623))
            Line((9.875, -30.041547623), (9.875, -14.958452375))
            Line((9.875, -14.958452375), (12.283452379, -12.549999996))
        make_face()
        with BuildLine():
            Line((4.9, -6.199999998), (9.950000001, -6.199999998))
            Line((9.950000001, -6.199999998), (9.950000001, -5.974999996))
            ThreePointArc((9.950000001, -5.974999996), (9.832842713, -5.692157283), (9.550000001, -5.574999996))
            Line((9.550000001, -5.574999996), (5.5, -5.574999996))
            ThreePointArc((5.5, -5.574999996), (5.075735931, -5.399264064), (4.9, -4.974999996))
            Line((4.9, -4.974999996), (4.9, -6.199999998))
        make_face()
        with BuildLine():
            Line((16.925000003, -12.549999998), (16.300000001, -12.549999998))
            Line((16.300000001, -12.549999998), (16.300000001, -17.599999999))
            Line((16.300000001, -17.599999999), (17.525000003, -17.599999999))
            ThreePointArc((17.525000003, -17.599999994), (17.100735934, -17.424264063), (16.925000003, -16.999999994))
            Line((16.925000003, -16.999999994), (16.925000003, -12.549999996))
        make_face()
        with BuildLine():
            Line((16.300000001, -27.399999996), (16.300000001, -32.449999996))
            Line((16.300000001, -32.449999996), (16.525, -32.449999996))
            ThreePointArc((16.525, -32.449999996), (16.807842713, -32.332842708), (16.925000001, -32.049999996))
            Line((16.925000001, -32.049999996), (16.925000001, -27.999999995))
            ThreePointArc((16.925000001, -27.999999995), (17.100735932, -27.575735926), (17.525000001, -27.399999995))
            Line((17.525000001, -27.399999996), (16.300000001, -27.399999996))
        make_face()
    extrude(amount=CUT_EXTRUDE2_DEPTH, mode=Mode.SUBTRACT)

    # Sketch25 → Cut-Extrude3 (cut, through all)
    with BuildSketch(Plane.XY.offset(45)):
        with Locations((-7.424999997, 18.400000003)):
            Rectangle(SKETCH25_W, SKETCH25_H)
        with Locations((7.425000001, 18.400000002)):
            Rectangle(SKETCH25_W_2, SKETCH25_H_2)
        Polygon((9.950000001, 12.283452379), (12.283452379, 9.950000001), (8.100000003, 5.766547625), (5.766547625, 8.100000003), align=None)
        Rectangle(SKETCH25_W_3, SKETCH25_H_3)
        Polygon((-12.283452379, 9.950000001), (-8.100000003, 5.766547625), (-5.766547625, 8.100000003), (-9.950000001, 12.283452379), align=None)
    extrude(amount=-CUT_EXTRUDE3_DEPTH, mode=Mode.SUBTRACT)

    # Fillet1
    fillet1_edges = [part.edges().sort_by_distance(p)[0] for p in [
        (9.950000001, 46.999999999, 6.199999998),
        (16.300000001, 46.999999999, 32.449999996),
        (16.300000001, 46.999999999, 12.549999998),
        (9.875, 46.999999999, 14.958452375),
        (12.283452379, 46.999999999, 12.549999996),
        (9.950000001, 46.999999999, 10.216547618),
        (7.54154762, 46.999999999, 12.624999999),
        (12.283452379, 46.999999999, 32.449999999),
        (9.875, 46.999999999, 30.041547623),
        (-7.54154762, 46.999999999, 12.624999999),
        (-9.949999999, 46.999999999, 10.216547618),
        (-9.949999997, 46.999999999, 6.199999998),
    ]]
    fillet(fillet1_edges, radius=FILLET1_R)

    # Sketch26 → Cut-Extrude4 (cut, through all)
    with BuildSketch(Plane.XY.offset(45)):
        Polygon((-22.500000001, 69.499999999), (-22.500000001, 16.300000001), (-5.700000002, 22.000000001), (-5.700000002, 22.600000001), (0.845499998, 22.600000001), (1.432241195, 9.875), (24.499999999, 9.875), (24.499999999, 69.499999999), align=None)
    extrude(amount=-CUT_EXTRUDE4_DEPTH, mode=Mode.SUBTRACT)

    # Sketch27 → Boss-Extrude1 (add)
    with BuildSketch(Plane.XY.offset(45).offset(BOSS_EXTRUDE1_START)):
        with BuildLine():
            Line((1.432241195, 9.875), (0.845499998, 22.600000001))
            Line((0.845499998, 22.600000001), (-5.700000002, 22.600000001))
            Line((-5.700000002, 22.600000001), (-5.700000002, 21.300000004))
            ThreePointArc((-5.700000002, 21.300000004), (-5.641421357, 21.158578646), (-5.499999997, 21.100000004))
            ThreePointArc((-5.499999997, 21.100000004), (-5.075735928, 20.924264072), (-4.899999997, 20.500000004))
            Line((-4.899999997, 20.500000004), (-4.899999997, 16.300000001))
            Line((-4.899999997, 16.300000001), (-9.949999997, 16.300000001))
            Line((-9.949999997, 16.300000001), (-9.950000001, 12.283452379))
            Line((-9.950000001, 12.283452379), (-7.541547622, 9.875))
            Line((-7.541547622, 9.875), (1.432241195, 9.875))
        make_face()
    extrude(amount=-BOSS_EXTRUDE1_DEPTH)


solid = part.part
